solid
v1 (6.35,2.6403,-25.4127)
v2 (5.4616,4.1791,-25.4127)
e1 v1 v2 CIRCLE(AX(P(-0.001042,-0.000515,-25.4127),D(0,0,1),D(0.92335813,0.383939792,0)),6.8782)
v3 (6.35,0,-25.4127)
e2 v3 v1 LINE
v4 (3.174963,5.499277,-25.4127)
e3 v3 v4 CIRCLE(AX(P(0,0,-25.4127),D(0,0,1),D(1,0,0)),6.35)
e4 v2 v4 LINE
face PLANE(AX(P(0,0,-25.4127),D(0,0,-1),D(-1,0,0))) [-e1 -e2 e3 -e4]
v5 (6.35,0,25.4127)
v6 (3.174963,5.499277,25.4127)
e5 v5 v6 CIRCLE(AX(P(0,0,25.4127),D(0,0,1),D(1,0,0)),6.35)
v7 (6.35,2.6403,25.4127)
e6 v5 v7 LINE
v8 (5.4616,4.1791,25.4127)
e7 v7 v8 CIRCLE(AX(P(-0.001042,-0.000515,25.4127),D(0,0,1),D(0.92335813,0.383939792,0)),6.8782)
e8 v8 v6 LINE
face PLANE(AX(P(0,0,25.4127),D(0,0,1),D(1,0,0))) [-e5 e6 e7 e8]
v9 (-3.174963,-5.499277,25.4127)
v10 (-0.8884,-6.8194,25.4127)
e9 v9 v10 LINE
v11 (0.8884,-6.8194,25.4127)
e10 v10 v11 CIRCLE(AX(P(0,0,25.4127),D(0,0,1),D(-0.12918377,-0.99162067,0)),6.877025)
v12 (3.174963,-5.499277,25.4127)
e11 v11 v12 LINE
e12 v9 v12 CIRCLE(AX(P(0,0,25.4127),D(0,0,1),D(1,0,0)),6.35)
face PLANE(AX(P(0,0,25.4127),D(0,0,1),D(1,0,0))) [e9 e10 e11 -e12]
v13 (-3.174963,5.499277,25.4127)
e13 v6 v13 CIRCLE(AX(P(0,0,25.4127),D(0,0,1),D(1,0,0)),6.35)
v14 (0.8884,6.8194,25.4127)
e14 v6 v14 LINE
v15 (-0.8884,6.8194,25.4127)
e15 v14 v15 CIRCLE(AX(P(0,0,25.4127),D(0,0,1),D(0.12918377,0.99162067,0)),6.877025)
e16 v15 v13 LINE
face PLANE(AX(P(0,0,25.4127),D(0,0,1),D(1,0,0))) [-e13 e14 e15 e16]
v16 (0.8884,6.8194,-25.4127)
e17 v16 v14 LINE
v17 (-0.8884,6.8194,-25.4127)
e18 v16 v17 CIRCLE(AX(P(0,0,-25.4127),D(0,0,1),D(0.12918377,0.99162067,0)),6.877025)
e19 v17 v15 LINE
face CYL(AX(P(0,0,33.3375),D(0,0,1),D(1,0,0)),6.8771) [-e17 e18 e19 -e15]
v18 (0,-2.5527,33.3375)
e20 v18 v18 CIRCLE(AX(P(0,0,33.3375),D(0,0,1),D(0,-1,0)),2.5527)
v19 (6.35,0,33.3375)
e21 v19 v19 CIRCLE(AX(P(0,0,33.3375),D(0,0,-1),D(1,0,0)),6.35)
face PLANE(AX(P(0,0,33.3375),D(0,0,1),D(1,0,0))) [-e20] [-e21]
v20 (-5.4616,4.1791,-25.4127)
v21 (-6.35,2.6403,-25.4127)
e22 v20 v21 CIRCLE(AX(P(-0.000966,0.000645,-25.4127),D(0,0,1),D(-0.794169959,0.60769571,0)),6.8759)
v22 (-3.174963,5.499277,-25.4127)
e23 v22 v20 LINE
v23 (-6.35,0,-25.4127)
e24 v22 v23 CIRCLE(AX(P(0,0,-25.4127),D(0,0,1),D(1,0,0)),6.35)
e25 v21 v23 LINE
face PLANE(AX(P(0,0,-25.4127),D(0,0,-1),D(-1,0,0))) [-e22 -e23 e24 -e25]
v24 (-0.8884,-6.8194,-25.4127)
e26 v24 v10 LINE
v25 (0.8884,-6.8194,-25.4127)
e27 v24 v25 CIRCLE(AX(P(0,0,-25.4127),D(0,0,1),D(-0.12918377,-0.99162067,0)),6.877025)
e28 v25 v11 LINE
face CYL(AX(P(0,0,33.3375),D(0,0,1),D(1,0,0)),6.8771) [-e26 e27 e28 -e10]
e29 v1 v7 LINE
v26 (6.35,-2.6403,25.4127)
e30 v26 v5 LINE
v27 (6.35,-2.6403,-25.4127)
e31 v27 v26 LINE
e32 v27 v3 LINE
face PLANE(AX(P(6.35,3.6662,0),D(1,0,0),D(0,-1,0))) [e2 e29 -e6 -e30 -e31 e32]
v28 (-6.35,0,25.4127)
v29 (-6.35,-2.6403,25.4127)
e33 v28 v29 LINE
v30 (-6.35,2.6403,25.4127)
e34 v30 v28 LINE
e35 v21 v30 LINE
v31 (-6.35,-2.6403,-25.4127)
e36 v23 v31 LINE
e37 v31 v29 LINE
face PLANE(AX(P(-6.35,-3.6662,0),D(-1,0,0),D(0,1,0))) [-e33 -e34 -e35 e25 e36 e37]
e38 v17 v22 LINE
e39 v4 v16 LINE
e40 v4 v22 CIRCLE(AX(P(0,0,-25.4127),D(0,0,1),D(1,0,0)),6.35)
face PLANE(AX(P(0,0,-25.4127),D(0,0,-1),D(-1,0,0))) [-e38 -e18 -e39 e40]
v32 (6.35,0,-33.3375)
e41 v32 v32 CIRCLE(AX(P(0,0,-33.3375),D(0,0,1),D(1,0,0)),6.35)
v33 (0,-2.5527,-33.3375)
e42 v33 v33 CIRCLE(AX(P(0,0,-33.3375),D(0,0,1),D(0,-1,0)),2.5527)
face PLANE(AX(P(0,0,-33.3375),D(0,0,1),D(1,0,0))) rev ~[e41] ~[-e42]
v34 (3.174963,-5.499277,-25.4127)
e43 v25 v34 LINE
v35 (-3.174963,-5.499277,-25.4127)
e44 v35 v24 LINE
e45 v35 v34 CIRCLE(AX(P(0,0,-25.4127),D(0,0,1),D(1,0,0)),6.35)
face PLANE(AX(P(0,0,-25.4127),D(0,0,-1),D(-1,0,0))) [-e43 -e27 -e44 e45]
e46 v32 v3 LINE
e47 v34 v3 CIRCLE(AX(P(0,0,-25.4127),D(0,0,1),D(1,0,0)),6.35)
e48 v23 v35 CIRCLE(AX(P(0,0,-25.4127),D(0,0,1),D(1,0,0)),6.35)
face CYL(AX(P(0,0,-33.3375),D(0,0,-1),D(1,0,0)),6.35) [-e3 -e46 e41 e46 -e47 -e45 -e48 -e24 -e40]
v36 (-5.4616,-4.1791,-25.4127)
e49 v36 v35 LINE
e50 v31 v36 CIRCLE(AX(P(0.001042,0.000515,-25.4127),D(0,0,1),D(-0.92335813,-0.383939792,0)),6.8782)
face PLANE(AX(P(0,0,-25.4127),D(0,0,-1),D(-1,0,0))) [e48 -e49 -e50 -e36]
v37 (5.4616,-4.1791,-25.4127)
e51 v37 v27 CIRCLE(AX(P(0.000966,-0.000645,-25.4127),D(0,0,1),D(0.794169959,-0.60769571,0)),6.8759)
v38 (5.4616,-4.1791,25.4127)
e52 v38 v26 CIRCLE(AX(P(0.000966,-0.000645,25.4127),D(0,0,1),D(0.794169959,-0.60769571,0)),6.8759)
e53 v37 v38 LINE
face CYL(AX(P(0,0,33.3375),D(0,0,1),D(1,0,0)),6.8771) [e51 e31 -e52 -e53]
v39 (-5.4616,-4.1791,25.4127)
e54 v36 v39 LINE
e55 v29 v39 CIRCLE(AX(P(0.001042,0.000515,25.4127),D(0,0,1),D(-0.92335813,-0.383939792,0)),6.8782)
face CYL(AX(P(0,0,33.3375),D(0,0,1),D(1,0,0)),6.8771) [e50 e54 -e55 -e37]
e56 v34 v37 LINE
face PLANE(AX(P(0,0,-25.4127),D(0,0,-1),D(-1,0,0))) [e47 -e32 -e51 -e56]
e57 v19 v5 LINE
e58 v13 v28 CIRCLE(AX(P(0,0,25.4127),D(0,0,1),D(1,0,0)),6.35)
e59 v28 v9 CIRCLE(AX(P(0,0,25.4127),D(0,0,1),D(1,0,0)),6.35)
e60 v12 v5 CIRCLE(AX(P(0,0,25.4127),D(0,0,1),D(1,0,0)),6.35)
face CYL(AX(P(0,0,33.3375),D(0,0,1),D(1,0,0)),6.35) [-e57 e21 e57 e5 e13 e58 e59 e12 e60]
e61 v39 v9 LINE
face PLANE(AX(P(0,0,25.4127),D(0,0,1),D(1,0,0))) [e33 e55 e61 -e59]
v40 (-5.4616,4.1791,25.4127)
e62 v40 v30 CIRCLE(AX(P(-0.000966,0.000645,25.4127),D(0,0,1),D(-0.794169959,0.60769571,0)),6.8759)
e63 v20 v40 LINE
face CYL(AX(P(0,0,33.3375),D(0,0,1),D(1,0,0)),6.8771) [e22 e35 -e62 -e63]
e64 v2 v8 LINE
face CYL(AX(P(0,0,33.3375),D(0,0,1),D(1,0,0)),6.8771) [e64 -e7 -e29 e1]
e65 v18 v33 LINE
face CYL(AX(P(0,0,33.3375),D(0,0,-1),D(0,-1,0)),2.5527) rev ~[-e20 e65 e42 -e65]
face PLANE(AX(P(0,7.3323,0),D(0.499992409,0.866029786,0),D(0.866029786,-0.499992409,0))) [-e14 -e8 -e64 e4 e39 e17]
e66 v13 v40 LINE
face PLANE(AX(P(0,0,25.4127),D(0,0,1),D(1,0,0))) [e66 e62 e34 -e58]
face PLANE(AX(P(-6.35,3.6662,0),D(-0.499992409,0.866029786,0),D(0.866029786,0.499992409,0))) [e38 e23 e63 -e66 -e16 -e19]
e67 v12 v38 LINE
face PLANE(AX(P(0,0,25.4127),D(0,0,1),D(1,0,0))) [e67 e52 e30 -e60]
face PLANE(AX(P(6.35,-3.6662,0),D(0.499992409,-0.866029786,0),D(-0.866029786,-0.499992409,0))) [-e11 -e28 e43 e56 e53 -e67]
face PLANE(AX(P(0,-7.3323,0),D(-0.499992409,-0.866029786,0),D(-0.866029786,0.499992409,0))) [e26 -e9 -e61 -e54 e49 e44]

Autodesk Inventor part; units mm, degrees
ref_plane "YZ Plane" through (0, 0, 0) normal (1, 0, 0) x (0, 1, 0)
ref_plane "XZ Plane" through (0, 0, 0) normal (0, 1, 0) x (-1, 0, 0)
ref_plane "XY Plane" through (0, 0, 0) normal (0, 0, 1) x (1, 0, 0)
sketch "Sketch1" plane through (0, 0, 0) normal (0, 0, 1) x (1, 0, 0)
  line L0 (-6.35, -3.6662) -> (-6.35, 3.6662)
  line L1 (-6.35, 3.6662) -> (0, 7.3323)
  line L2 (0, 7.3323) -> (6.35, 3.6662)
  line L3 (6.35, 3.6662) -> (6.35, -3.6662)
  line L4 (6.35, -3.6662) -> (0, -7.3323)
  line L5 (0, -7.3323) -> (-6.35, -3.6662)
  point P0 (0, 0)
  point P1 (0, 0)
  dimension "Size" = 12.7
extrude "Extrusion1" add sketch "Sketch1" along normal mid plane 66.675
sketch "Sketch3" plane through (0, 0, 33.3375) normal (0, 0, 1) x (1, 0, 0)
  line L0 (-6.35, 3.6662) -> (0, 7.3323) construction
  line L1 (0, 7.3323) -> (6.35, 3.6662) construction
  line L2 (6.35, 3.6662) -> (6.35, -3.6662) construction
  line L3 (6.35, -3.6662) -> (0, -7.3323) construction
  line L4 (0, -7.3323) -> (-6.35, -3.6662) construction
  line L5 (-6.35, -3.6662) -> (-6.35, 3.6662) construction
  point P0 (0, 0)
hole "Hole1" at (0, 0, 33.3375) direction (0, 0, -1) diameter 5.1054 end through all
sketch "Sketch4" plane through (0, 0, 33.3375) normal (0, 0, 1) x (1, 0, 0)
  circle A0 centre (0, 0) radius 2.5527 construction
  line L0 (-6.35, 3.6662) -> (0, 7.3323) construction
  line L1 (0, 7.3323) -> (6.35, 3.6662) construction
  line L2 (6.35, 3.6662) -> (6.35, -3.6662) construction
  line L3 (6.35, -3.6662) -> (0, -7.3323) construction
  line L4 (0, -7.3323) -> (-6.35, -3.6662) construction
  line L5 (-6.35, -3.6662) -> (-6.35, 3.6662) construction
  circle A1 centre (0, 0) radius 6.8771
  circle A2 centre (0, 0) radius 8.89
  dimension "thunder" = 13.7541
  dimension "d16" = 17.78
extrude "Extrusion3" cut sketch "Sketch4" against normal through all
sketch "Sketch5" plane through (0, 0, 33.3375) normal (0, 0, 1) x (1, 0, 0)
  circle A0 centre (0, 0) radius 2.5527 projected
  circle A1 centre (0, 0) radius 6.35
  arc A2 (5.4616, -4.1791) -> (6.35, -2.6403) centre (0, 0) ccw projected
  line L0 (6.35, -2.6403) -> (6.35, 2.6403) projected
  arc A3 (6.35, 2.6403) -> (5.4616, 4.1791) centre (0, 0) ccw projected
  line L1 (5.4616, 4.1791) -> (0.8884, 6.8194) projected
  arc A4 (0.8884, 6.8194) -> (-0.8884, 6.8194) centre (0, 0) ccw projected
  line L2 (-0.8884, 6.8194) -> (-5.4616, 4.1791) projected
  arc A5 (-5.4616, 4.1791) -> (-6.35, 2.6403) centre (0, 0) ccw projected
  line L3 (-6.35, 2.6403) -> (-6.35, -2.6403) projected
  arc A6 (-6.35, -2.6403) -> (-5.4616, -4.1791) centre (0, 0) ccw projected
  line L4 (-5.4616, -4.1791) -> (-0.8884, -6.8194) projected
  arc A7 (-0.8884, -6.8194) -> (0.8884, -6.8194) centre (0, 0) ccw projected
  line L5 (0.8884, -6.8194) -> (5.4616, -4.1791) projected
  circle A8 centre (0, 0) radius 2.5527 projected
  point P0 (3.175, -5.4993)
  point P1 (-3.175, -5.4993)
  point P2 (-6.35, 0)
  point P3 (-3.175, 5.4993)
  point P4 (3.175, 5.4993)
  point P5 (6.35, 0)
  dimension "d21" = 12.7
extrude "Extrusion4" cut sketch "Sketch5" against normal blind 7.9248 contours A0 | L0 A2 L5 A1 | A1 L1 A3 L0 | A1 L2 A4 L1 | L5 A7 L4 A1 | A1 L3 A5 L2 | L4 A6 L3 A1
mirror "Mirror2" about plane through (0, 0, 0) normal (0, 0, 1) of "Extrusion4"
equation "\"bearing\" = 25.4"
properties part number "GP10-011" material "Aluminum 6061"
